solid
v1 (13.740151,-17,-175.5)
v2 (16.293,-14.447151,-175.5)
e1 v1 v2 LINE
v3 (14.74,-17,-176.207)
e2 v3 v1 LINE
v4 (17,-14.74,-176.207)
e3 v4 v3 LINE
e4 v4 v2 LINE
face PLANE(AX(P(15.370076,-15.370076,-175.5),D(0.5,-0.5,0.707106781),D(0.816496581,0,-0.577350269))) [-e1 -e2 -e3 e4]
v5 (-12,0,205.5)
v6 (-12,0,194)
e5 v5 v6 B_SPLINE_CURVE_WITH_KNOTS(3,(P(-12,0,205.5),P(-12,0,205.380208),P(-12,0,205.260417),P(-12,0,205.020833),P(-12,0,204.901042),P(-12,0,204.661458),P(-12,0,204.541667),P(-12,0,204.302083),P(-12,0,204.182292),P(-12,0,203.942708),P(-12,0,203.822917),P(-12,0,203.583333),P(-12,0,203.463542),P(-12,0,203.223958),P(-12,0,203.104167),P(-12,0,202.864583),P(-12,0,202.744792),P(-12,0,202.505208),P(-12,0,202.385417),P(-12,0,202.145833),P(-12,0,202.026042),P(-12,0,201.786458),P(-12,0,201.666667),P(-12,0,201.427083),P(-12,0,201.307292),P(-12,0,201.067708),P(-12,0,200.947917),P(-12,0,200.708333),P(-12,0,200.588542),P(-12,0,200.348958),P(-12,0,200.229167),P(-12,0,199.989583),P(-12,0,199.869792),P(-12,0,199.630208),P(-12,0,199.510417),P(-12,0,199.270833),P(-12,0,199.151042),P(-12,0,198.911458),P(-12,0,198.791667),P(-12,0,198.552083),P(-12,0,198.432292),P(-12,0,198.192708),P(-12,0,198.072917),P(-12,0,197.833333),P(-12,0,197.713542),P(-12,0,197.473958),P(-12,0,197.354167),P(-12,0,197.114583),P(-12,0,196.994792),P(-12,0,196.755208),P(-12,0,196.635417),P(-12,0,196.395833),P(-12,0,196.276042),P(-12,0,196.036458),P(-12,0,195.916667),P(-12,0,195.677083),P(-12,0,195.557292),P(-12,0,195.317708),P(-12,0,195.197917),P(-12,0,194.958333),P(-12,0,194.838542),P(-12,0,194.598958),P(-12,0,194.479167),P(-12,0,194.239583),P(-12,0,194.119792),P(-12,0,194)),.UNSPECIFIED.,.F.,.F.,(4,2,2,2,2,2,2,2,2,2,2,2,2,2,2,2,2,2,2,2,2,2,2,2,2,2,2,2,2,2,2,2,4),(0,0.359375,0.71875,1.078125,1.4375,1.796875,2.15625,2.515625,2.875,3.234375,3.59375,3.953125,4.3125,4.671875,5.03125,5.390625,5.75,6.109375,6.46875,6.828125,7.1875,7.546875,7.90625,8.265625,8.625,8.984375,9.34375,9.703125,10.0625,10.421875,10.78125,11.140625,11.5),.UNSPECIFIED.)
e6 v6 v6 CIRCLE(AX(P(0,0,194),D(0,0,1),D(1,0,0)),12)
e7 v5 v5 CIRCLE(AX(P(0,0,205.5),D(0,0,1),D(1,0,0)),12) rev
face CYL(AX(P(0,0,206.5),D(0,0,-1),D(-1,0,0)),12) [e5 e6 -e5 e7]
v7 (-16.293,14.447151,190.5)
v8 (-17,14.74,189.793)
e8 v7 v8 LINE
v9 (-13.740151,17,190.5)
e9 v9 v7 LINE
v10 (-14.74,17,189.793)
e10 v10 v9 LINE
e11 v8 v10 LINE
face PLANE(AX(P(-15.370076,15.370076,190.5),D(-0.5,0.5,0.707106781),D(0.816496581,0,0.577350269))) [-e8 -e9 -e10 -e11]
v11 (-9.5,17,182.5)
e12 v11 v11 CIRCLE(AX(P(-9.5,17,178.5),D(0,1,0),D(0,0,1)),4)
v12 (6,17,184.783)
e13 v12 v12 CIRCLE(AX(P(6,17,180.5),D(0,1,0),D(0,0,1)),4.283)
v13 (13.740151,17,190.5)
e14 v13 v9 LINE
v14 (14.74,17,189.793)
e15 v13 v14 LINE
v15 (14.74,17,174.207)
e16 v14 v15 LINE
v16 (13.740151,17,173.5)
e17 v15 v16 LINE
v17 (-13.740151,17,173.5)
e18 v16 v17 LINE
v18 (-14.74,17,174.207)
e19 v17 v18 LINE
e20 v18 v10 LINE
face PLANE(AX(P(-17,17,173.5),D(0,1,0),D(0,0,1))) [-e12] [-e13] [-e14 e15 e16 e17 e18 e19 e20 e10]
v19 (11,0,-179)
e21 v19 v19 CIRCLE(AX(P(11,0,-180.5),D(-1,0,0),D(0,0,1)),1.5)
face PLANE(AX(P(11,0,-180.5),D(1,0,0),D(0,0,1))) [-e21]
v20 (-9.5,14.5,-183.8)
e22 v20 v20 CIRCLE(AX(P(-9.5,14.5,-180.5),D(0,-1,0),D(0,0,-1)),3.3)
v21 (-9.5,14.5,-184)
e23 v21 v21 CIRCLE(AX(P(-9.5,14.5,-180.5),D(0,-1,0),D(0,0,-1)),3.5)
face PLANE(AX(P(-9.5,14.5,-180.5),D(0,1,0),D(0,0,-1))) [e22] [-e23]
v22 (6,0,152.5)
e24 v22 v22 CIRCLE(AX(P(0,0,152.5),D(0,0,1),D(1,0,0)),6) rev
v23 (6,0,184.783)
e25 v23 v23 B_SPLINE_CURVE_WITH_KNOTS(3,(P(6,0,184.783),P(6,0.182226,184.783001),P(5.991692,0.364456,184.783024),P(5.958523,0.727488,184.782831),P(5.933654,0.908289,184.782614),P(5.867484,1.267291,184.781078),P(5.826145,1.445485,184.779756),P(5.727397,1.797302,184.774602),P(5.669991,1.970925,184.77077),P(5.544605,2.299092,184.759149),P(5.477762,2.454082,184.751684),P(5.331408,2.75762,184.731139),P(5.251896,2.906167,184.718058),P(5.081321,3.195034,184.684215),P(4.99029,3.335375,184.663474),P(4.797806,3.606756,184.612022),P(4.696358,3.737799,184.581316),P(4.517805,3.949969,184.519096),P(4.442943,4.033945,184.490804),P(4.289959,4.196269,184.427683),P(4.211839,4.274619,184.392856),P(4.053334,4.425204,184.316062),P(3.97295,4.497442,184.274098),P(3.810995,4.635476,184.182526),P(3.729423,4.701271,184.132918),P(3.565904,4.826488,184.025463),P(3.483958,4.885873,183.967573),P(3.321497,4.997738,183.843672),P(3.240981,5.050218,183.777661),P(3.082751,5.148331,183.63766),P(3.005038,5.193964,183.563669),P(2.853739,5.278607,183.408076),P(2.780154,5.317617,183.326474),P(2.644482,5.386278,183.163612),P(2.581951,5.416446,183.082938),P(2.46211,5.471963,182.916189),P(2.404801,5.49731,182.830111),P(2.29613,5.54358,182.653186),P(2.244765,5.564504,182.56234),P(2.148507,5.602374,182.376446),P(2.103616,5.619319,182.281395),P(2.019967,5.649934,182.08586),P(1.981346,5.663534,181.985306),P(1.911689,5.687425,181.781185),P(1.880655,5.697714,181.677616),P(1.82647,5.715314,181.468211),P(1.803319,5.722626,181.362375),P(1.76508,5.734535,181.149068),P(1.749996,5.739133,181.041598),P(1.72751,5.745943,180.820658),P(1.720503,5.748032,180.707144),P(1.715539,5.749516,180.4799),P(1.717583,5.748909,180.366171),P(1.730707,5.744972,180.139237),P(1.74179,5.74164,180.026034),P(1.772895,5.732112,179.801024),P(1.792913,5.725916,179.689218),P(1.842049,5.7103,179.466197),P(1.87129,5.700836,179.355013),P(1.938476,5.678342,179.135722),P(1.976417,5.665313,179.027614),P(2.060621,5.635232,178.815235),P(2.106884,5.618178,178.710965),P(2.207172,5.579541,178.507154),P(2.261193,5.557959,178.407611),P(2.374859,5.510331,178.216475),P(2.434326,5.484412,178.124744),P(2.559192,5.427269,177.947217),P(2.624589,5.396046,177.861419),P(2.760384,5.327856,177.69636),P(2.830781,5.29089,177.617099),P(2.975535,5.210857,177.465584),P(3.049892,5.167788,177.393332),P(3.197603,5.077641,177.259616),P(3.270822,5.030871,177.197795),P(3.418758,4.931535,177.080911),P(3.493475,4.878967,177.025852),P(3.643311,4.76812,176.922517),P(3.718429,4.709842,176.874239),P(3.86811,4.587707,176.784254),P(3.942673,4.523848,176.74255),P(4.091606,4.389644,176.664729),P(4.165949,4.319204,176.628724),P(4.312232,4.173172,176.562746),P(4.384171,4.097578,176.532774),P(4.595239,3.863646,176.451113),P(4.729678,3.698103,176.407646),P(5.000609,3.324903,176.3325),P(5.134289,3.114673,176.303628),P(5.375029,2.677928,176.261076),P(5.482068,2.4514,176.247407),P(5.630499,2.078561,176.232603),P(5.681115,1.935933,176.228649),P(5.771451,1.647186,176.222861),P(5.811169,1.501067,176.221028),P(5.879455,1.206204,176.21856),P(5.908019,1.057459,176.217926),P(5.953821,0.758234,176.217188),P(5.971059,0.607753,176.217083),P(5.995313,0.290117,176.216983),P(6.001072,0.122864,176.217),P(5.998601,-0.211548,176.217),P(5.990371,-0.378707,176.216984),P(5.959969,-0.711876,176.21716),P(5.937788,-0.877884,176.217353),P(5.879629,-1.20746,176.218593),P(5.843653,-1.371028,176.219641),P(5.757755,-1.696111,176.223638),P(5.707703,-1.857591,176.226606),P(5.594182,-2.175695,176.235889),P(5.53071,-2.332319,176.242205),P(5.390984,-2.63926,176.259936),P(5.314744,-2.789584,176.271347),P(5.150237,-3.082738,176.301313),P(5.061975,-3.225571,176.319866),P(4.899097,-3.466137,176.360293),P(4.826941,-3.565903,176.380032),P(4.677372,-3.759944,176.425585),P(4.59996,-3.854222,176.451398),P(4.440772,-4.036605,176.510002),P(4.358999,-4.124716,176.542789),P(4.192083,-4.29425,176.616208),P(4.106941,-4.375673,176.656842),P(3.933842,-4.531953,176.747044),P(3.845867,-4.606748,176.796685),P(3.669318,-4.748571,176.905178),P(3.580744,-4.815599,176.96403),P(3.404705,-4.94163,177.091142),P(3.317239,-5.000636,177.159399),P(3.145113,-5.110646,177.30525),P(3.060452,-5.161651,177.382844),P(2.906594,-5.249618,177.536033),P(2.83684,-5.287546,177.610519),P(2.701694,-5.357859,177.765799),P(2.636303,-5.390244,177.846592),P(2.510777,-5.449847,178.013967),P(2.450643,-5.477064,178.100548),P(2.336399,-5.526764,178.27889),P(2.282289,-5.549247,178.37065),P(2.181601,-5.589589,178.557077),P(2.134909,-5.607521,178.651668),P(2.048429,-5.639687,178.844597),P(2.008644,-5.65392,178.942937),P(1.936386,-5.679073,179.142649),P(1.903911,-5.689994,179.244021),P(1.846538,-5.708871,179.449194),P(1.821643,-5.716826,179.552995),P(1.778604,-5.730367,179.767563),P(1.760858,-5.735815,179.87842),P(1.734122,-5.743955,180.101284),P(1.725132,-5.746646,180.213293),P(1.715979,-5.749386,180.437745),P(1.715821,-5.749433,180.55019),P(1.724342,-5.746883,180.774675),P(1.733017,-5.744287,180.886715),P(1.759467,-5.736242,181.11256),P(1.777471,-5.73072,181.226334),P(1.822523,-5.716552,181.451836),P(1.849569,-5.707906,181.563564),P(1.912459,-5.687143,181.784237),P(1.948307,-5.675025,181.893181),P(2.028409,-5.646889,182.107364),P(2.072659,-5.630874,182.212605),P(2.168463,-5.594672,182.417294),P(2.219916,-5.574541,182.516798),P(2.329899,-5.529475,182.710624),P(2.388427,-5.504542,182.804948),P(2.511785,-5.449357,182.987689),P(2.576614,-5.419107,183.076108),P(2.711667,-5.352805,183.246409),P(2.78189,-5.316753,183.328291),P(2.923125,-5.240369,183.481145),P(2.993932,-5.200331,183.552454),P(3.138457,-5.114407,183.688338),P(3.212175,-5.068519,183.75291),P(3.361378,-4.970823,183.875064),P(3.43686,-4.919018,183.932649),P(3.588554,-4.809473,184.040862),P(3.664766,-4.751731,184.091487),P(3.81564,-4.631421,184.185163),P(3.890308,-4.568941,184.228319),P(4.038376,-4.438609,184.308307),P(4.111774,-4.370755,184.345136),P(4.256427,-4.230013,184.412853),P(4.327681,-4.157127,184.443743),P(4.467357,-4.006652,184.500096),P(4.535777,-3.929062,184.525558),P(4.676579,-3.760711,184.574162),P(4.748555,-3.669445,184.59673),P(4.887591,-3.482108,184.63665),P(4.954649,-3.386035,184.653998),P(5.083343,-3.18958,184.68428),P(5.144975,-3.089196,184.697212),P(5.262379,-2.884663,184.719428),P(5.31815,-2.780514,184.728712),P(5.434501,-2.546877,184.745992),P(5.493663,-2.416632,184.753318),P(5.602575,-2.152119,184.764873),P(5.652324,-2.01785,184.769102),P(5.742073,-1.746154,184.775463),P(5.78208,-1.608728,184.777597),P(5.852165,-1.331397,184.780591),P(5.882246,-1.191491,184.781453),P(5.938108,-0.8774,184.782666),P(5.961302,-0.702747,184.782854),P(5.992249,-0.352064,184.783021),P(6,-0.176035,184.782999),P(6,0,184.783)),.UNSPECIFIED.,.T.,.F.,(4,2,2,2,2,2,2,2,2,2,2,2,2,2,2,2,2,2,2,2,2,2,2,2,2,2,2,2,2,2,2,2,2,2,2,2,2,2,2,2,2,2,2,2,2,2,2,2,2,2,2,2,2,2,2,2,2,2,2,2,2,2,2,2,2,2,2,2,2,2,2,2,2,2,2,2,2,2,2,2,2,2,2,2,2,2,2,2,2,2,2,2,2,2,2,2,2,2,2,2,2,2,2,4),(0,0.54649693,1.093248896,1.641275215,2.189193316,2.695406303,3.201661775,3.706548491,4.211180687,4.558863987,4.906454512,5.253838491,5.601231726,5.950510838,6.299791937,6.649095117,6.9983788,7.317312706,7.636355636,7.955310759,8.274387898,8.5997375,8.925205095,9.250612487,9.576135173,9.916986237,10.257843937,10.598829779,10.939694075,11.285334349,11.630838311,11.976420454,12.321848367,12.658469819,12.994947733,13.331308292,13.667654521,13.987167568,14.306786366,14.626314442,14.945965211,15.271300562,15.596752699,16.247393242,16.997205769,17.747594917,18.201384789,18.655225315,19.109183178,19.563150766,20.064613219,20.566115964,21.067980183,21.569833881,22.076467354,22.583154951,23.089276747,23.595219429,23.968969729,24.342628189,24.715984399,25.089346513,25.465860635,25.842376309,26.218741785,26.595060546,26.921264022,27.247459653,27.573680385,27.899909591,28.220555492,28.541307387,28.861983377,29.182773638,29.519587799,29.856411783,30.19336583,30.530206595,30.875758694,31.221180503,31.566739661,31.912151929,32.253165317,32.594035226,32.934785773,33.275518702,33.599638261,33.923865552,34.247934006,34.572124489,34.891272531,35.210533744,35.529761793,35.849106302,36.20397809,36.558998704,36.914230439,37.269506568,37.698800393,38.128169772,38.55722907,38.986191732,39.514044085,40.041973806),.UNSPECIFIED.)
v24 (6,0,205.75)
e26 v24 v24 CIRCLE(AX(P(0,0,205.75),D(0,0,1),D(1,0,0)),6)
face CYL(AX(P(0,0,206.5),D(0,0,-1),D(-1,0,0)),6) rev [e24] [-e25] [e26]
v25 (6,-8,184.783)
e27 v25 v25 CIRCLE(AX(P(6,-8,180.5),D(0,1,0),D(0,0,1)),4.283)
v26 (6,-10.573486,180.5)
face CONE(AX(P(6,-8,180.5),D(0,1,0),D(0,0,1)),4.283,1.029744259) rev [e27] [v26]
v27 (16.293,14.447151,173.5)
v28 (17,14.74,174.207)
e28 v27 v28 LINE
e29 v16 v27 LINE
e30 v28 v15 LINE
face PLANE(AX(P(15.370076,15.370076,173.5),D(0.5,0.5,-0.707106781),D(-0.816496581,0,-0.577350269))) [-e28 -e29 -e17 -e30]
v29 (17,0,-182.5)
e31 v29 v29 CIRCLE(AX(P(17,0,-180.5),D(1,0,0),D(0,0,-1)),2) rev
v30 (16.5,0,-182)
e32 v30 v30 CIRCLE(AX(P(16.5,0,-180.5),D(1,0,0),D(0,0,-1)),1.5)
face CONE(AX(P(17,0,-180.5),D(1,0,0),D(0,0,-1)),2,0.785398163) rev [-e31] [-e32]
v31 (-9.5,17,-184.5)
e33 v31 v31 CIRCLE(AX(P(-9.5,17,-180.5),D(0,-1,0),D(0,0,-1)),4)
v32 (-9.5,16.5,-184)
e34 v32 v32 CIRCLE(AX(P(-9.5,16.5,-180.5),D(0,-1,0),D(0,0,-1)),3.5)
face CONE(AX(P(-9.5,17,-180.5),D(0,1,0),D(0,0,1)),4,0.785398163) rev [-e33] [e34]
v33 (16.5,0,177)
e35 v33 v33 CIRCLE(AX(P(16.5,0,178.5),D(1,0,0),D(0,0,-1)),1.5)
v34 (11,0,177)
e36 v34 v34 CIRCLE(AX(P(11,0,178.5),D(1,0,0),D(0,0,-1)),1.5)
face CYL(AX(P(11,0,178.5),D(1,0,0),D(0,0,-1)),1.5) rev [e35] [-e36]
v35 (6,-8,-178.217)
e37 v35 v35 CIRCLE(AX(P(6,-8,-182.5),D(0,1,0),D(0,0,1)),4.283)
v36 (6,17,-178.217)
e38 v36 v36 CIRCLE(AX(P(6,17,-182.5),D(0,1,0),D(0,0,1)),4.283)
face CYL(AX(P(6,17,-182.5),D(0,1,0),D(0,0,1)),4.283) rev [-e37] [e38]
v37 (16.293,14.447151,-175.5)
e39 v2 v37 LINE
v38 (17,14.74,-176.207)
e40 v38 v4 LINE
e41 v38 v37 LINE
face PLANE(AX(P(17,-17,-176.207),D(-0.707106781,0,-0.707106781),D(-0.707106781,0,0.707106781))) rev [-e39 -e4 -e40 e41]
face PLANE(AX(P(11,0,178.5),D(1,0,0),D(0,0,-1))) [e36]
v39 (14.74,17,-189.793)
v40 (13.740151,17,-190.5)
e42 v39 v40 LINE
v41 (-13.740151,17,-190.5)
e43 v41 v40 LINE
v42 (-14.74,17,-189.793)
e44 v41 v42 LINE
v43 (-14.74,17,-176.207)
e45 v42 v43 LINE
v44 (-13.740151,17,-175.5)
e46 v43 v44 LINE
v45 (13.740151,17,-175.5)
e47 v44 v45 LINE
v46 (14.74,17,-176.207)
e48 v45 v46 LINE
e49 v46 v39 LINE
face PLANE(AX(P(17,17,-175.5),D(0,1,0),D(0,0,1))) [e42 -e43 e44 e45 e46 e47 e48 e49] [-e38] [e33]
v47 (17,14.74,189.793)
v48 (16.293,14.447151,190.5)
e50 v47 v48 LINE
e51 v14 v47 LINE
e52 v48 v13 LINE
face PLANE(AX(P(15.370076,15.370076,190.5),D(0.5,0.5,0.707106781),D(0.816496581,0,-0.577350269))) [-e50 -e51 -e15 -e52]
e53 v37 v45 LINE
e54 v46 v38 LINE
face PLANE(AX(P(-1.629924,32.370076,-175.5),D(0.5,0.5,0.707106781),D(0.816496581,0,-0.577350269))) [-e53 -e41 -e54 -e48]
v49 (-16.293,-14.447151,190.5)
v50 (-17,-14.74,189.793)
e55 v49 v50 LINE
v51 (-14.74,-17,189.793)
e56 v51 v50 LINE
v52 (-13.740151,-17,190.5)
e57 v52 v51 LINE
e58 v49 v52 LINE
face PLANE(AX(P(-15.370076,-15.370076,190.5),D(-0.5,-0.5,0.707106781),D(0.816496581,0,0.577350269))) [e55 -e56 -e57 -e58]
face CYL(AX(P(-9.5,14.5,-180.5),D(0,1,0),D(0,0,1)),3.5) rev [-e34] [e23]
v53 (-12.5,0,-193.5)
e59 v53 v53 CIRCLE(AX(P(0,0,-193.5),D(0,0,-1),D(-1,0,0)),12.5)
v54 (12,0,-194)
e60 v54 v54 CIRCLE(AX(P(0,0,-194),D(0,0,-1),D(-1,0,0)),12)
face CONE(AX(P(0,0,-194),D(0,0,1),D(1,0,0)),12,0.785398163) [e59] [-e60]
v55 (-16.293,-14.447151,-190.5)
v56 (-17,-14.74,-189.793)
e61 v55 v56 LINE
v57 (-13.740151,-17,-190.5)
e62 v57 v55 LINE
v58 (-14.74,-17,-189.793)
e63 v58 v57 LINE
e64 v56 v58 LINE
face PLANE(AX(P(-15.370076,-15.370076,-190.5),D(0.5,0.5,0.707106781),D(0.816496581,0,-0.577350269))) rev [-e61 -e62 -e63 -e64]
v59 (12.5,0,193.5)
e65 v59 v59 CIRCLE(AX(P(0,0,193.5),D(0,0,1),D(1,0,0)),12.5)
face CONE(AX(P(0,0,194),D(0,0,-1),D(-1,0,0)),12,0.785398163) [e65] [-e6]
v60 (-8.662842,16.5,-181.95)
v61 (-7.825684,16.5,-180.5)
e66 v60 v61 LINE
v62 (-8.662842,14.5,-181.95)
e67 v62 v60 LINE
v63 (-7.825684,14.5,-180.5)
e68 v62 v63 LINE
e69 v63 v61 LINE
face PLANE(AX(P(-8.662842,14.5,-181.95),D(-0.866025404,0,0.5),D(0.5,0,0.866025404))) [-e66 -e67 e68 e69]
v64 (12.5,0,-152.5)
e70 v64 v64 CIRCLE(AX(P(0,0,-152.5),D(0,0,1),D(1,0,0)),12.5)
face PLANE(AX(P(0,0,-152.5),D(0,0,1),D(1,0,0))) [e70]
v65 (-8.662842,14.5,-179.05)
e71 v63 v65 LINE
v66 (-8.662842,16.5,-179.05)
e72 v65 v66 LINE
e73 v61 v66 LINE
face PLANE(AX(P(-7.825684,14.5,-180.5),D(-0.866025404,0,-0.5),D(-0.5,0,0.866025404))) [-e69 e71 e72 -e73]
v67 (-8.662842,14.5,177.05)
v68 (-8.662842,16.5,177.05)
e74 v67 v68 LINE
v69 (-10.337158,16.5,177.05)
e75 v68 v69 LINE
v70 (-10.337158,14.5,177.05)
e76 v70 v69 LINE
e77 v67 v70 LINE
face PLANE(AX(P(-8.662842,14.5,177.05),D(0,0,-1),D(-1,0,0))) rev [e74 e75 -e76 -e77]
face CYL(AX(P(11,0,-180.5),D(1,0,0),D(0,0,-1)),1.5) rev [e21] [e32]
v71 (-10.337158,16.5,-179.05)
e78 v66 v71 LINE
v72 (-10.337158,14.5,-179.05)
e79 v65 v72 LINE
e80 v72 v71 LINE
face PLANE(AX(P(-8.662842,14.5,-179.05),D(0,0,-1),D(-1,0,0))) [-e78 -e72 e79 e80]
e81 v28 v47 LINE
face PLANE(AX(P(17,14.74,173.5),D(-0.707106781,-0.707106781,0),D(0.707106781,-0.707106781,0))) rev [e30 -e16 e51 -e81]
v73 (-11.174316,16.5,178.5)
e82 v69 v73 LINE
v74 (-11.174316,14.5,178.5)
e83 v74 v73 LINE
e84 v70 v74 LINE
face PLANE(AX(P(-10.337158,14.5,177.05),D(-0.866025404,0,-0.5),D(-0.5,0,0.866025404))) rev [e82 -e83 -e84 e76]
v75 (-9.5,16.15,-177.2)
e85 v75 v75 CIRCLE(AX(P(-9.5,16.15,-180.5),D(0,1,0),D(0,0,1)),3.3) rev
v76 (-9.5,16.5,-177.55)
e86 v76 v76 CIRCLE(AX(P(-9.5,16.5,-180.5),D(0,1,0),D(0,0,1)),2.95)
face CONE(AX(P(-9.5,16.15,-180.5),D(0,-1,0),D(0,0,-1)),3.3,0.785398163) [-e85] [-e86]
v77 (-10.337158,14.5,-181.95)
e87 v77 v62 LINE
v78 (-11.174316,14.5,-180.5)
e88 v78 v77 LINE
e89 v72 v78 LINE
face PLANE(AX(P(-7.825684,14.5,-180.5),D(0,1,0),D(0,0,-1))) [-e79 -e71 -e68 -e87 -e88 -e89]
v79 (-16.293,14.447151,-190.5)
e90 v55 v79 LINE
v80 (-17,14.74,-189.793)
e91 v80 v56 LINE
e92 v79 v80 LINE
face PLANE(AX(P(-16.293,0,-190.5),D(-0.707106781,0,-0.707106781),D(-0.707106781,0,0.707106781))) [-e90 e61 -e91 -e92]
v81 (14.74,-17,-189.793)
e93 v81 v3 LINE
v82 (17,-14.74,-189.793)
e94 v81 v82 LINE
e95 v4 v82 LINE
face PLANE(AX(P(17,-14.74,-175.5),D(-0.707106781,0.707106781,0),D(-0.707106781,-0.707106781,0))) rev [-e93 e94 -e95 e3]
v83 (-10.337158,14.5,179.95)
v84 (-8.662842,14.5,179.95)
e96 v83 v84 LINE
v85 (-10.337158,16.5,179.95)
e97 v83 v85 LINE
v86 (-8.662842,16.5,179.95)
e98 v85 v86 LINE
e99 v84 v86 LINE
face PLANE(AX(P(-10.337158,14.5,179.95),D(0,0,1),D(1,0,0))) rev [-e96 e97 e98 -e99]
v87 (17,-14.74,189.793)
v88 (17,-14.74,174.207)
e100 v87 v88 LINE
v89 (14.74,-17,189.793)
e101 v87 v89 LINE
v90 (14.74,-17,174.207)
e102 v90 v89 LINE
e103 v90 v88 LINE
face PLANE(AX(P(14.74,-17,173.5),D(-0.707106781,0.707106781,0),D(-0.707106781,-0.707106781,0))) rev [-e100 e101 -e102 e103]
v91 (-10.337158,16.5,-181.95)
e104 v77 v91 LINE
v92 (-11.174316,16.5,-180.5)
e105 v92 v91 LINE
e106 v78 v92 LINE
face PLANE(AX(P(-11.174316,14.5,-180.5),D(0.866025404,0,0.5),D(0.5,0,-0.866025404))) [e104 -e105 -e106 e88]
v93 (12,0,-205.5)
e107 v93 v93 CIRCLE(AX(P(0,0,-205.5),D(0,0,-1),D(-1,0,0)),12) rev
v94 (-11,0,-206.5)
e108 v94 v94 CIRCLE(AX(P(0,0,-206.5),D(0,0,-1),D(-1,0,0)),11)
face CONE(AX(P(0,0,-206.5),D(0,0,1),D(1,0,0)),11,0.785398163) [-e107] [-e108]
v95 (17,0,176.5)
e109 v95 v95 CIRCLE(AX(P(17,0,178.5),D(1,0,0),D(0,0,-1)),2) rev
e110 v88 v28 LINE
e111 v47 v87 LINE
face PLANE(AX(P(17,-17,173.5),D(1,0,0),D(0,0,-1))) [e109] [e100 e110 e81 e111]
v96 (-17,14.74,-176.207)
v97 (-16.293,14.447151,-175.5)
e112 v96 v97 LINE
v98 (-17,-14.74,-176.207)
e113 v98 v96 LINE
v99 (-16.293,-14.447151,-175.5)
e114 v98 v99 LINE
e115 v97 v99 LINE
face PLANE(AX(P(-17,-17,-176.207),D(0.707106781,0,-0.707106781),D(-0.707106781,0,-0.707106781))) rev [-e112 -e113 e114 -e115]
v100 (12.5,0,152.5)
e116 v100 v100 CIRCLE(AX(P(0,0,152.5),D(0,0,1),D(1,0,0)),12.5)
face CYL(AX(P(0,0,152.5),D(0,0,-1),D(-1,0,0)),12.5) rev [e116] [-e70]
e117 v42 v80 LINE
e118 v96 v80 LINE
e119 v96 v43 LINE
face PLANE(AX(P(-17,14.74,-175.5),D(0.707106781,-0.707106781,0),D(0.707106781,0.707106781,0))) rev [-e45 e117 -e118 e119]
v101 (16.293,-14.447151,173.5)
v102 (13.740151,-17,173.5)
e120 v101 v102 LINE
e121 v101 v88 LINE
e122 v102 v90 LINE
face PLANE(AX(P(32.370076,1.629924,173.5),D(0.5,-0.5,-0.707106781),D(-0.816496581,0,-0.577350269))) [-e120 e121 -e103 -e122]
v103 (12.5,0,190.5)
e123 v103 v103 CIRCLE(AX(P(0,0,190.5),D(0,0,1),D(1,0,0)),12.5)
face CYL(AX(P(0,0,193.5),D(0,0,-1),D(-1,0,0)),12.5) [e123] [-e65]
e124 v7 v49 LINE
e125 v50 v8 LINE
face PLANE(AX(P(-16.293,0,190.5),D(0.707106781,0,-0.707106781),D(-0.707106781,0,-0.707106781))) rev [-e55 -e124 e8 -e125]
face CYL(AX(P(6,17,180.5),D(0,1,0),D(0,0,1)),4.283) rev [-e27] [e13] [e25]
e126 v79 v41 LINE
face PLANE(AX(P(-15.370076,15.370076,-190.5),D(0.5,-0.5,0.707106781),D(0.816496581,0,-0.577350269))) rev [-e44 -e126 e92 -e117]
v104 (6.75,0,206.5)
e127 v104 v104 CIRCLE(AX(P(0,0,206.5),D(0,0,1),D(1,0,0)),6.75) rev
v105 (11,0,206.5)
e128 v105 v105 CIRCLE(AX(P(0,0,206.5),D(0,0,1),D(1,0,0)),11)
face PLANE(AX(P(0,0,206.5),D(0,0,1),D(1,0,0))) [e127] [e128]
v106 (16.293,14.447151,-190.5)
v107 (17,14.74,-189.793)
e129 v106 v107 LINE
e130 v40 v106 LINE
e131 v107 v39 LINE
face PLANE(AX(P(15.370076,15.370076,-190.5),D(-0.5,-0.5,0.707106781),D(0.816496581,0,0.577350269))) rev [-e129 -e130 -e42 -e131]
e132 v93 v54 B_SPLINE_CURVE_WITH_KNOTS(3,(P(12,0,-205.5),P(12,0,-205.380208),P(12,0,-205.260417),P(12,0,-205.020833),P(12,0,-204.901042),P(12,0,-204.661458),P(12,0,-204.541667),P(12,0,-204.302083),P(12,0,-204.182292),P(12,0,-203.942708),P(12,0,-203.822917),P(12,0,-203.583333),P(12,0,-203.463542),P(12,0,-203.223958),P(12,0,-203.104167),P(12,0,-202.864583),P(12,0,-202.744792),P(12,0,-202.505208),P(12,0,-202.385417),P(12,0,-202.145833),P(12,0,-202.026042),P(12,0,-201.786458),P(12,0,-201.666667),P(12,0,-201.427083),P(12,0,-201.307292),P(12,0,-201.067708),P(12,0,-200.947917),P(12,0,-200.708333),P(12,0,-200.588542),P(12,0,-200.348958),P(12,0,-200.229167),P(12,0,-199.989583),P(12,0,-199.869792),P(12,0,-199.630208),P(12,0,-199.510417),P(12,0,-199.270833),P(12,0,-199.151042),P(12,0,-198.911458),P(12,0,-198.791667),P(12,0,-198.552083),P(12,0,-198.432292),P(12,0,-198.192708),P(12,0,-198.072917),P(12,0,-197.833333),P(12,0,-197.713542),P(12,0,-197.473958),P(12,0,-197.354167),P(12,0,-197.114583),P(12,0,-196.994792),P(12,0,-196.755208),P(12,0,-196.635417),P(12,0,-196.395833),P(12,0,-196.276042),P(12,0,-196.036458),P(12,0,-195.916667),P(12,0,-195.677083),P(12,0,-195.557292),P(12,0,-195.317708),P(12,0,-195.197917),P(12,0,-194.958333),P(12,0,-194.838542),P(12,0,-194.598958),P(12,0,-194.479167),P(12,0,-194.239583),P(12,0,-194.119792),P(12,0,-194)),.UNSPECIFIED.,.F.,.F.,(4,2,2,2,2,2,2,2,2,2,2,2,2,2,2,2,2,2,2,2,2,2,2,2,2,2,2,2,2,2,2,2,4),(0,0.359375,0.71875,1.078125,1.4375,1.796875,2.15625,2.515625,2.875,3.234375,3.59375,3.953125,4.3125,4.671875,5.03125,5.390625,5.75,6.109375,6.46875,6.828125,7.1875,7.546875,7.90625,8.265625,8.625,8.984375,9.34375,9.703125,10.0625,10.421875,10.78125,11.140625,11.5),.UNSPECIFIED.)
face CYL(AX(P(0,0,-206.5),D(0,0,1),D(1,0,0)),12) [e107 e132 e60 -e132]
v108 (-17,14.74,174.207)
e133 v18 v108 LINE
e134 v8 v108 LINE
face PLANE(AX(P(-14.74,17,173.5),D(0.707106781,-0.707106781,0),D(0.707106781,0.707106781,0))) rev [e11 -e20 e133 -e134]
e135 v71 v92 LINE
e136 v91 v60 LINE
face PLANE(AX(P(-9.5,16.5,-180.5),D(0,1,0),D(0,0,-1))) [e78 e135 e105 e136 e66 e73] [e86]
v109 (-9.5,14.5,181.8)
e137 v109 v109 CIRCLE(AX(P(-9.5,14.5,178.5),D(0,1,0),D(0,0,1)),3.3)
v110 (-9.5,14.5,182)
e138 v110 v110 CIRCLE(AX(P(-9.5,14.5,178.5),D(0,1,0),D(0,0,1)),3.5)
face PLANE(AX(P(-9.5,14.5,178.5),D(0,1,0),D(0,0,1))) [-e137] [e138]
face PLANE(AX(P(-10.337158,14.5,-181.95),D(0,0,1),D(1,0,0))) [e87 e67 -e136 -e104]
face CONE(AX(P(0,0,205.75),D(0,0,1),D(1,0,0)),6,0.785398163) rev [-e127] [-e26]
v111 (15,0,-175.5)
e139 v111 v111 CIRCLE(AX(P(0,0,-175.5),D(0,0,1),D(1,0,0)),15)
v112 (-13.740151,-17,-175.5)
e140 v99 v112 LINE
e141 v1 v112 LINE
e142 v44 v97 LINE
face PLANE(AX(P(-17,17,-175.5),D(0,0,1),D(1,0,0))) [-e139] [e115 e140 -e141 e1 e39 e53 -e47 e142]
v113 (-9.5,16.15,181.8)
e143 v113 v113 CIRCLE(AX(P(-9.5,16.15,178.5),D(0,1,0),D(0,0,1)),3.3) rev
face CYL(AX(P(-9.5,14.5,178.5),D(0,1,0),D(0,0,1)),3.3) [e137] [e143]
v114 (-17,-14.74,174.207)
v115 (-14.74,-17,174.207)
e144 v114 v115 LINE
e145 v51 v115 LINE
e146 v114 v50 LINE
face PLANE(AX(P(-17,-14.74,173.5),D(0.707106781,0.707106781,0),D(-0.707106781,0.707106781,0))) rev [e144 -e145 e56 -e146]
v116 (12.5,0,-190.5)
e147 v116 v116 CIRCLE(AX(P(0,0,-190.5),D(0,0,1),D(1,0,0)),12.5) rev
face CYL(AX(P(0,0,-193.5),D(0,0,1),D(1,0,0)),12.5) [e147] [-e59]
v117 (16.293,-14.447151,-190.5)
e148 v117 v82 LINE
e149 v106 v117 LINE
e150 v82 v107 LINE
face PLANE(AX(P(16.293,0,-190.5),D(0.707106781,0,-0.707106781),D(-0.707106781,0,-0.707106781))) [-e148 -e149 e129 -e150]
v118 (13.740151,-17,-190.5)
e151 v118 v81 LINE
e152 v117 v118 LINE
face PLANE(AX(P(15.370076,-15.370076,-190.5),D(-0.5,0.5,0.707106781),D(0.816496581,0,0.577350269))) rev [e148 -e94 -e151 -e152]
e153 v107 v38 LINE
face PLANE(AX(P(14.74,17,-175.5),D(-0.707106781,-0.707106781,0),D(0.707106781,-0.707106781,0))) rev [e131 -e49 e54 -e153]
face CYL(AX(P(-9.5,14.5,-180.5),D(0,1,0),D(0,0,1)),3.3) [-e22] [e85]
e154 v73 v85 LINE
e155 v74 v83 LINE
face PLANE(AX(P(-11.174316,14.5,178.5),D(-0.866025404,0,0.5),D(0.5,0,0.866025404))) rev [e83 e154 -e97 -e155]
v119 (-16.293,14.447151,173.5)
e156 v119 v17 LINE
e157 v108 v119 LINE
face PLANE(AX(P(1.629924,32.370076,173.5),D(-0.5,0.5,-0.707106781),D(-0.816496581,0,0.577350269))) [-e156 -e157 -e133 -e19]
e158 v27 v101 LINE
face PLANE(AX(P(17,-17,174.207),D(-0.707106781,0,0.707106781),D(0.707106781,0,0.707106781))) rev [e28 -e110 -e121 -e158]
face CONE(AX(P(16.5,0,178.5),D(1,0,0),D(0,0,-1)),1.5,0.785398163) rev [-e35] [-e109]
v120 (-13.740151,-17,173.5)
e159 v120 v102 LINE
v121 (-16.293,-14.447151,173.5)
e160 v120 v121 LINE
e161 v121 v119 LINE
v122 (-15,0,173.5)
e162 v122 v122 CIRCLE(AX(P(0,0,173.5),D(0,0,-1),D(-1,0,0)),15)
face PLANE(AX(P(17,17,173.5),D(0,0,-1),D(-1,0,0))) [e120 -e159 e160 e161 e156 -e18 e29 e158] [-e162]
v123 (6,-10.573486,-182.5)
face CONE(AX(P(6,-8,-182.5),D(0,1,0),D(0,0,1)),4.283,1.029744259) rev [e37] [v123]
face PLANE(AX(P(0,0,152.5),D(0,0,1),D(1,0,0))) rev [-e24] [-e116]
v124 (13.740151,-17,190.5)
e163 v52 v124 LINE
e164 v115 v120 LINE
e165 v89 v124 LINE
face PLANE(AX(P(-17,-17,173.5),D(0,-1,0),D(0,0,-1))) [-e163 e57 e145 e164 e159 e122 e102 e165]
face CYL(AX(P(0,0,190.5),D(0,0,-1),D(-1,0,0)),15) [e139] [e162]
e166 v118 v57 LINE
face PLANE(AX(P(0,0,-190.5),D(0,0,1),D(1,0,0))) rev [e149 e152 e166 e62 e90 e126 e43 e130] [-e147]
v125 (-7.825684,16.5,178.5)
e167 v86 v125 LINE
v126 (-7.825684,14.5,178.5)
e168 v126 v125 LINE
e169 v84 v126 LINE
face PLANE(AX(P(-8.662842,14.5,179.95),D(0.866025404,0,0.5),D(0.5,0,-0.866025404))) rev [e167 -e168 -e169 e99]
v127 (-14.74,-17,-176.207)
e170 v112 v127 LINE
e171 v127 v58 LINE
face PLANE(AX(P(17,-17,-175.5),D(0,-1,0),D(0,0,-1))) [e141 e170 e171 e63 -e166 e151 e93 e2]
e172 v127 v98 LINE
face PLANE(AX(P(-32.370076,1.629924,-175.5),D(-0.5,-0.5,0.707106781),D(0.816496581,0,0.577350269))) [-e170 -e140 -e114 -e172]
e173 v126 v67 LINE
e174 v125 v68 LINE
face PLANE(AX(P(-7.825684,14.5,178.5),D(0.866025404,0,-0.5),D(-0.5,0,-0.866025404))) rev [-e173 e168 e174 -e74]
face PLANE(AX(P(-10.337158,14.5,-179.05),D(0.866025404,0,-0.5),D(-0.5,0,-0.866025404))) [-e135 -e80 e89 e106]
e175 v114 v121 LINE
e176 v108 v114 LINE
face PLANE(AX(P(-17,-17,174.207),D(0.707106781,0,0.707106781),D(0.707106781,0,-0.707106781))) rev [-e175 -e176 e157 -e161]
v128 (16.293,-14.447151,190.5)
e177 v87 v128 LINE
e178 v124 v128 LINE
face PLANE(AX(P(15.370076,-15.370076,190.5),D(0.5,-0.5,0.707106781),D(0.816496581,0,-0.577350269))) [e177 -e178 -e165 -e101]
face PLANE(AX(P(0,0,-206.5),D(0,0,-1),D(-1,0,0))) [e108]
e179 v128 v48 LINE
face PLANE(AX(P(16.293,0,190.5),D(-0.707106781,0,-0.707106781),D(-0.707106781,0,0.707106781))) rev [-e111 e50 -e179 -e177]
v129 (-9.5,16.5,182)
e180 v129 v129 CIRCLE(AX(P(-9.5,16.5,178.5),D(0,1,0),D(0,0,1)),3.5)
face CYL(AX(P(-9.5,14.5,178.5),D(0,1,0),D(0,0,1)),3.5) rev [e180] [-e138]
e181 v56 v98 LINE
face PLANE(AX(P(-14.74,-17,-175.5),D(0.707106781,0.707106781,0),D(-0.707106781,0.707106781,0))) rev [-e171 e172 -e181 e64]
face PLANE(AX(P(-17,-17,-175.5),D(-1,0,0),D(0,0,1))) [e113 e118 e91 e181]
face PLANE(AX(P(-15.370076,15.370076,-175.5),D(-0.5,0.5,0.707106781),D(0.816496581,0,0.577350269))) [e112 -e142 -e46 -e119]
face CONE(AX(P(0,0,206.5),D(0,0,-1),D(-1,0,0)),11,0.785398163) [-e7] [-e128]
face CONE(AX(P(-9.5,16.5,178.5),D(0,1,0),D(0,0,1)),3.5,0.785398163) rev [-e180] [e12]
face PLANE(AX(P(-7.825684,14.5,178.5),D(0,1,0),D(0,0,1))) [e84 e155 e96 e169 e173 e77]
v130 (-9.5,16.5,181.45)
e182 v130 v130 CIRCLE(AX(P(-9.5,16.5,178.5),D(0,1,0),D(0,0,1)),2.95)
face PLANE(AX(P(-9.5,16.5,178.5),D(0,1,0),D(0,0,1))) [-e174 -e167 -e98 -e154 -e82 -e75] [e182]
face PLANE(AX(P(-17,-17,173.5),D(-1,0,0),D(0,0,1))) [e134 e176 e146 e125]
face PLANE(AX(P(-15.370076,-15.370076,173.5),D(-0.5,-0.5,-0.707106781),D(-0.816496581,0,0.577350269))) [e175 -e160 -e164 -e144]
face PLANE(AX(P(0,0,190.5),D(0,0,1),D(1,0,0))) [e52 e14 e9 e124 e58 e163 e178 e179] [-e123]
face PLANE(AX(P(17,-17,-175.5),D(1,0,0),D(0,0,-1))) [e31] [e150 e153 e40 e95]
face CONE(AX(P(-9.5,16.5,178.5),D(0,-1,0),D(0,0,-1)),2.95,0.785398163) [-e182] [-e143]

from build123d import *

# Parameters (mm, degrees)
SKETCH1_R                = 15
BOSS_EXTRUDE1_DEPTH      = 190.5
SKETCH2_W                = 34
SKETCH2_H                = 34
BOSS_EXTRUDE2_DEPTH      = 17
SKETCH3_W                = 34
SKETCH3_H                = 34
BOSS_EXTRUDE3_DEPTH      = 15
CHAMFER2_SIZE            = 2.26
CHAMFER3_SIZE            = 0.707
SKETCH4_R                = 12.5
BOSS_EXTRUDE4_DEPTH      = 3
BOSS_EXTRUDE5_START      = 3
SKETCH5_R                = 12.5
BOSS_EXTRUDE5_DEPTH      = 3
SKETCH8_R                = 12
BOSS_EXTRUDE6_DEPTH      = 13
CHAMFER4_SIZE            = 0.5
BOSS_EXTRUDE7_START      = 13
SKETCH9_R                = 12
BOSS_EXTRUDE7_DEPTH      = 13
CHAMFER5_SIZE            = 0.5
CHAMFER6_SIZE            = 1
CHAMFER10_SIZE           = 1
SKETCH6_R                = 12.5
CUT_EXTRUDE1_DEPTH       = 152.5
SKETCH7_R                = 6
CUT_EXTRUDE2_DEPTH       = 208.89480513
CHAMFER7_SIZE            = 0.75
SKETCH10_R               = 3.5
SKETCH10_R_2             = 3.3
CUT_EXTRUDE3_DEPTH       = 2.5
SKETCH12_R               = 3.3
CUT_EXTRUDE4_DEPTH       = 0.5
CHAMFER8_SIZE            = 0.35
CUT_EXTRUDE5_DEPTH       = 2
SKETCH14_R               = 4
SKETCH14_R_2             = 3.5
CUT_EXTRUDE6_DEPTH       = 0.5
CHAMFER9_SIZE            = 0.5
CHAMFER8_OF_MIRROR1_SIZE = 0.35
CHAMFER9_OF_MIRROR1_SIZE = 0.5
SKETCH19_R               = 1.5
CUT_EXTRUDE8_DEPTH       = 6
CHAMFER11_SIZE           = 0.5
G1_8_TAPPED_HOLE1_D      = 8.566
G1_8_TAPPED_HOLE1_DEPTH  = 25
G1_8_TAPPED_HOLE1_TIP    = 2.573486031


with BuildPart() as part:
    # Sketch1 → Boss-Extrude1 (new, symmetric)
    with BuildSketch(Plane.XY):
        Circle(SKETCH1_R)
    extrude(amount=BOSS_EXTRUDE1_DEPTH, both=True)

    # Sketch2 → Boss-Extrude2 (add)
    with BuildSketch(Plane.XY.offset(190.5)):
        Rectangle(SKETCH2_W, SKETCH2_H)
    extrude(amount=-BOSS_EXTRUDE2_DEPTH)

    # Sketch3 → Boss-Extrude3 (add)
    with BuildSketch(Plane(origin=(0, 0, -190.5), x_dir=(-1, 0, 0), z_dir=(0, 0, -1))):
        Rectangle(SKETCH3_W, SKETCH3_H)
    extrude(amount=-BOSS_EXTRUDE3_DEPTH)

    # Chamfer2
    chamfer2_edges = [part.edges().sort_by_distance(p)[0] for p in [
        (-17, 17, -183),
        (-17, -17, -183),
        (17, -17, -183),
        (17, 17, -183),
        (17, 17, 182),
        (17, -17, 182),
        (-17, -17, 182),
        (-17, 17, 182),
    ]]
    chamfer(chamfer2_edges, length=CHAMFER2_SIZE)

    # Chamfer3
    chamfer3_edges = [part.edges().sort_by_distance(p)[0] for p in [
        (-17, 0, -190.5),
        (17, 0, -190.5),
        (-15.87, 15.87, -190.5),
        (15.87, 15.87, -190.5),
        (15.87, -15.87, -190.5),
        (-15.87, -15.87, -190.5),
        (-17, 0, -175.5),
        (17, 0, -175.5),
        (-15.87, 15.87, -175.5),
        (15.87, 15.87, -175.5),
        (15.87, -15.87, -175.5),
        (-15.87, -15.87, -175.5),
        (-17, 0, 190.5),
        (-17, 0, 173.5),
        (17, 0, 190.5),
        (15.87, 15.87, 190.5),
        (-15.87, 15.87, 190.5),
        (15.87, -15.87, 190.5),
        (-15.87, -15.87, 190.5),
        (17, 0, 173.5),
        (15.87, 15.87, 173.5),
        (-15.87, 15.87, 173.5),
        (15.87, -15.87, 173.5),
        (-15.87, -15.87, 173.5),
    ]]
    chamfer(chamfer3_edges, length=CHAMFER3_SIZE)

    # Sketch4 → Boss-Extrude4 (add)
    with BuildSketch(Plane(origin=(0, 0, -190.5), x_dir=(-1, 0, 0), z_dir=(0, 0, -1))):
        with Locations(Location((0, 0, 0), (0, 0, 180))):
            Circle(SKETCH4_R)
    extrude(amount=BOSS_EXTRUDE4_DEPTH)

    # Sketch5 → Boss-Extrude5 (add)
    with BuildSketch(Plane.XY.offset(190.5).offset(BOSS_EXTRUDE5_START)):
        Circle(SKETCH5_R)
    extrude(amount=-BOSS_EXTRUDE5_DEPTH)

    # Sketch8 → Boss-Extrude6 (add)
    with BuildSketch(Plane.XY.offset(193.5)):
        with Locations(Location((0, 0, 0), (0, 0, 180))):
            Circle(SKETCH8_R)
    extrude(amount=BOSS_EXTRUDE6_DEPTH)

    # Chamfer4
    chamfer4_edges = [part.edges().sort_by_distance(p)[0] for p in [
        (12, 0, 193.5),
    ]]
    chamfer(chamfer4_edges, length=CHAMFER4_SIZE - 0.0001)  # a hair under: the kernel refuses the full size

    # Sketch9 → Boss-Extrude7 (add)
    with BuildSketch(Plane(origin=(0, 0, -193.5), x_dir=(-1, 0, 0), z_dir=(0, 0, -1)).offset(BOSS_EXTRUDE7_START)):
        Circle(SKETCH9_R)
    extrude(amount=-BOSS_EXTRUDE7_DEPTH)

    # Chamfer5
    chamfer5_edges = [part.edges().sort_by_distance(p)[0] for p in [
        (12, 0, -193.5),
    ]]
    chamfer(chamfer5_edges, length=CHAMFER5_SIZE - 0.0001)  # a hair under: the kernel refuses the full size

    # Chamfer6
    chamfer6_edges = [part.edges().sort_by_distance(p)[0] for p in [
        (12, 0, 206.5),
    ]]
    chamfer(chamfer6_edges, length=CHAMFER6_SIZE)

    # Chamfer10
    chamfer10_edges = [part.edges().sort_by_distance(p)[0] for p in [
        (12, 0, -206.5),
    ]]
    chamfer(chamfer10_edges, length=CHAMFER10_SIZE)

    # Sketch6 → Cut-Extrude1 (cut, symmetric)
    with BuildSketch(Plane.XY):
        Circle(SKETCH6_R)
    extrude(amount=CUT_EXTRUDE1_DEPTH, both=True, mode=Mode.SUBTRACT)

    # Sketch7 → Cut-Extrude2 (cut, through all)
    with BuildSketch(Plane.XY):
        Circle(SKETCH7_R)
    extrude(amount=CUT_EXTRUDE2_DEPTH, mode=Mode.SUBTRACT)

    # Chamfer7
    chamfer7_edges = [part.edges().sort_by_distance(p)[0] for p in [
        (-6, 0, 206.5),
    ]]
    chamfer(chamfer7_edges, length=CHAMFER7_SIZE)

    # Sketch10 → Cut-Extrude3 (cut)
    with BuildSketch(Plane(origin=(0, 17, 0), x_dir=(1, 0, 0), z_dir=(0, 1, 0))):
        with Locations(Location((-9.5, -178.5, 0), (0, 0, 270))):
            Circle(SKETCH10_R)
        with Locations(Location((-9.5, -178.5, 0), (0, 0, 270))):
            Circle(SKETCH10_R_2, mode=Mode.SUBTRACT)
    cut_extrude3 = extrude(amount=-CUT_EXTRUDE3_DEPTH, mode=Mode.SUBTRACT)

    # Sketch12 → Cut-Extrude4 (cut)
    with BuildSketch(Plane(origin=(0, 17, 0), x_dir=(1, 0, 0), z_dir=(0, 1, 0))):
        with Locations(Location((-9.5, -178.5, 0), (0, 0, 270))):
            Circle(SKETCH12_R)
    cut_extrude4 = extrude(amount=-CUT_EXTRUDE4_DEPTH, mode=Mode.SUBTRACT)

    # Chamfer8
    chamfer8_edges = [part.edges().sort_by_distance(p)[0] for p in [
        (-9.5, 16.5, 175.2),
    ]]
    chamfer(chamfer8_edges, length=CHAMFER8_SIZE)

    # Sketch13 → Cut-Extrude5 (cut)
    with BuildSketch(Plane(origin=(0, 16.5, 0), x_dir=(1, 0, 0), z_dir=(0, 1, 0))):
        Polygon((-7.825684219, -178.5), (-8.66284211, -177.05), (-10.33715789, -177.05), (-11.174315781, -178.5), (-10.33715789, -179.95), (-8.66284211, -179.95), align=None)
    cut_extrude5 = extrude(amount=-CUT_EXTRUDE5_DEPTH, mode=Mode.SUBTRACT)

    # Sketch14 → Cut-Extrude6 (cut)
    with BuildSketch(Plane(origin=(0, 17, 0), x_dir=(1, 0, 0), z_dir=(0, 1, 0))):
        with Locations(Location((-9.5, -178.5, 0), (0, 0, 270))):
            Circle(SKETCH14_R)
        with Locations(Location((-9.5, -178.5, 0), (0, 0, 270))):
            Circle(SKETCH14_R_2, mode=Mode.SUBTRACT)
    cut_extrude6 = extrude(amount=-CUT_EXTRUDE6_DEPTH, mode=Mode.SUBTRACT)

    # Chamfer9
    chamfer9_edges = [part.edges().sort_by_distance(p)[0] for p in [
        (-9.5, 16.5, 174.5),
    ]]
    chamfer(chamfer9_edges, length=CHAMFER9_SIZE - 0.0001)  # a hair under: the kernel refuses the full size

    # Mirror1: Cut-Extrude3, Cut-Extrude4, Cut-Extrude5, Cut-Extrude6 across plane
    add(cut_extrude3.mirror(Plane.XY.offset(-1)), mode=Mode.SUBTRACT)
    add(cut_extrude4.mirror(Plane.XY.offset(-1)), mode=Mode.SUBTRACT)
    add(cut_extrude5.mirror(Plane.XY.offset(-1)), mode=Mode.SUBTRACT)
    add(cut_extrude6.mirror(Plane.XY.offset(-1)), mode=Mode.SUBTRACT)

    # Chamfer8 of Mirror1
    chamfer8_of_mirror1_edges = [part.edges().sort_by_distance(p)[0] for p in [
        (-9.5, 16.5, -177.2),
    ]]
    chamfer(chamfer8_of_mirror1_edges, length=CHAMFER8_OF_MIRROR1_SIZE)

    # Chamfer9 of Mirror1
    chamfer9_of_mirror1_edges = [part.edges().sort_by_distance(p)[0] for p in [
        (-9.5, 16.5, -176.5),
    ]]
    chamfer(chamfer9_of_mirror1_edges, length=CHAMFER9_OF_MIRROR1_SIZE - 0.0001)  # a hair under: the kernel refuses the full size

    # Sketch19 → Cut-Extrude8 (cut)
    with BuildSketch(Plane(origin=(17, 0, 0), x_dir=(0, 0, -1), z_dir=(1, 0, 0))):
        with Locations((-178.5, 0)):
            Circle(SKETCH19_R)
    cut_extrude8 = extrude(amount=-CUT_EXTRUDE8_DEPTH, mode=Mode.SUBTRACT)

    # Mirror3: Cut-Extrude8 across plane
    add(cut_extrude8.mirror(Plane.XY.offset(-1)), mode=Mode.SUBTRACT)

    # Chamfer11
    chamfer11_edges = [part.edges().sort_by_distance(p)[0] for p in [
        (17, 0, 180),
        (17, 0, -182),
    ]]
    chamfer(chamfer11_edges, length=CHAMFER11_SIZE)

    # G1/8 Tapped Hole1
    with Locations(Plane(origin=(0, 17, 0), x_dir=(-1, 0, 0), z_dir=(0, 1, 0))):
        with Locations((-6, 180.5), (-6, -182.5)):
            Hole(G1_8_TAPPED_HOLE1_D / 2, depth=G1_8_TAPPED_HOLE1_DEPTH)
            with Locations((0, 0, -(G1_8_TAPPED_HOLE1_DEPTH + G1_8_TAPPED_HOLE1_TIP / 2))):  # 118° drill point
                Cone(0, G1_8_TAPPED_HOLE1_D / 2, G1_8_TAPPED_HOLE1_TIP, mode=Mode.SUBTRACT)


solid = part.part
